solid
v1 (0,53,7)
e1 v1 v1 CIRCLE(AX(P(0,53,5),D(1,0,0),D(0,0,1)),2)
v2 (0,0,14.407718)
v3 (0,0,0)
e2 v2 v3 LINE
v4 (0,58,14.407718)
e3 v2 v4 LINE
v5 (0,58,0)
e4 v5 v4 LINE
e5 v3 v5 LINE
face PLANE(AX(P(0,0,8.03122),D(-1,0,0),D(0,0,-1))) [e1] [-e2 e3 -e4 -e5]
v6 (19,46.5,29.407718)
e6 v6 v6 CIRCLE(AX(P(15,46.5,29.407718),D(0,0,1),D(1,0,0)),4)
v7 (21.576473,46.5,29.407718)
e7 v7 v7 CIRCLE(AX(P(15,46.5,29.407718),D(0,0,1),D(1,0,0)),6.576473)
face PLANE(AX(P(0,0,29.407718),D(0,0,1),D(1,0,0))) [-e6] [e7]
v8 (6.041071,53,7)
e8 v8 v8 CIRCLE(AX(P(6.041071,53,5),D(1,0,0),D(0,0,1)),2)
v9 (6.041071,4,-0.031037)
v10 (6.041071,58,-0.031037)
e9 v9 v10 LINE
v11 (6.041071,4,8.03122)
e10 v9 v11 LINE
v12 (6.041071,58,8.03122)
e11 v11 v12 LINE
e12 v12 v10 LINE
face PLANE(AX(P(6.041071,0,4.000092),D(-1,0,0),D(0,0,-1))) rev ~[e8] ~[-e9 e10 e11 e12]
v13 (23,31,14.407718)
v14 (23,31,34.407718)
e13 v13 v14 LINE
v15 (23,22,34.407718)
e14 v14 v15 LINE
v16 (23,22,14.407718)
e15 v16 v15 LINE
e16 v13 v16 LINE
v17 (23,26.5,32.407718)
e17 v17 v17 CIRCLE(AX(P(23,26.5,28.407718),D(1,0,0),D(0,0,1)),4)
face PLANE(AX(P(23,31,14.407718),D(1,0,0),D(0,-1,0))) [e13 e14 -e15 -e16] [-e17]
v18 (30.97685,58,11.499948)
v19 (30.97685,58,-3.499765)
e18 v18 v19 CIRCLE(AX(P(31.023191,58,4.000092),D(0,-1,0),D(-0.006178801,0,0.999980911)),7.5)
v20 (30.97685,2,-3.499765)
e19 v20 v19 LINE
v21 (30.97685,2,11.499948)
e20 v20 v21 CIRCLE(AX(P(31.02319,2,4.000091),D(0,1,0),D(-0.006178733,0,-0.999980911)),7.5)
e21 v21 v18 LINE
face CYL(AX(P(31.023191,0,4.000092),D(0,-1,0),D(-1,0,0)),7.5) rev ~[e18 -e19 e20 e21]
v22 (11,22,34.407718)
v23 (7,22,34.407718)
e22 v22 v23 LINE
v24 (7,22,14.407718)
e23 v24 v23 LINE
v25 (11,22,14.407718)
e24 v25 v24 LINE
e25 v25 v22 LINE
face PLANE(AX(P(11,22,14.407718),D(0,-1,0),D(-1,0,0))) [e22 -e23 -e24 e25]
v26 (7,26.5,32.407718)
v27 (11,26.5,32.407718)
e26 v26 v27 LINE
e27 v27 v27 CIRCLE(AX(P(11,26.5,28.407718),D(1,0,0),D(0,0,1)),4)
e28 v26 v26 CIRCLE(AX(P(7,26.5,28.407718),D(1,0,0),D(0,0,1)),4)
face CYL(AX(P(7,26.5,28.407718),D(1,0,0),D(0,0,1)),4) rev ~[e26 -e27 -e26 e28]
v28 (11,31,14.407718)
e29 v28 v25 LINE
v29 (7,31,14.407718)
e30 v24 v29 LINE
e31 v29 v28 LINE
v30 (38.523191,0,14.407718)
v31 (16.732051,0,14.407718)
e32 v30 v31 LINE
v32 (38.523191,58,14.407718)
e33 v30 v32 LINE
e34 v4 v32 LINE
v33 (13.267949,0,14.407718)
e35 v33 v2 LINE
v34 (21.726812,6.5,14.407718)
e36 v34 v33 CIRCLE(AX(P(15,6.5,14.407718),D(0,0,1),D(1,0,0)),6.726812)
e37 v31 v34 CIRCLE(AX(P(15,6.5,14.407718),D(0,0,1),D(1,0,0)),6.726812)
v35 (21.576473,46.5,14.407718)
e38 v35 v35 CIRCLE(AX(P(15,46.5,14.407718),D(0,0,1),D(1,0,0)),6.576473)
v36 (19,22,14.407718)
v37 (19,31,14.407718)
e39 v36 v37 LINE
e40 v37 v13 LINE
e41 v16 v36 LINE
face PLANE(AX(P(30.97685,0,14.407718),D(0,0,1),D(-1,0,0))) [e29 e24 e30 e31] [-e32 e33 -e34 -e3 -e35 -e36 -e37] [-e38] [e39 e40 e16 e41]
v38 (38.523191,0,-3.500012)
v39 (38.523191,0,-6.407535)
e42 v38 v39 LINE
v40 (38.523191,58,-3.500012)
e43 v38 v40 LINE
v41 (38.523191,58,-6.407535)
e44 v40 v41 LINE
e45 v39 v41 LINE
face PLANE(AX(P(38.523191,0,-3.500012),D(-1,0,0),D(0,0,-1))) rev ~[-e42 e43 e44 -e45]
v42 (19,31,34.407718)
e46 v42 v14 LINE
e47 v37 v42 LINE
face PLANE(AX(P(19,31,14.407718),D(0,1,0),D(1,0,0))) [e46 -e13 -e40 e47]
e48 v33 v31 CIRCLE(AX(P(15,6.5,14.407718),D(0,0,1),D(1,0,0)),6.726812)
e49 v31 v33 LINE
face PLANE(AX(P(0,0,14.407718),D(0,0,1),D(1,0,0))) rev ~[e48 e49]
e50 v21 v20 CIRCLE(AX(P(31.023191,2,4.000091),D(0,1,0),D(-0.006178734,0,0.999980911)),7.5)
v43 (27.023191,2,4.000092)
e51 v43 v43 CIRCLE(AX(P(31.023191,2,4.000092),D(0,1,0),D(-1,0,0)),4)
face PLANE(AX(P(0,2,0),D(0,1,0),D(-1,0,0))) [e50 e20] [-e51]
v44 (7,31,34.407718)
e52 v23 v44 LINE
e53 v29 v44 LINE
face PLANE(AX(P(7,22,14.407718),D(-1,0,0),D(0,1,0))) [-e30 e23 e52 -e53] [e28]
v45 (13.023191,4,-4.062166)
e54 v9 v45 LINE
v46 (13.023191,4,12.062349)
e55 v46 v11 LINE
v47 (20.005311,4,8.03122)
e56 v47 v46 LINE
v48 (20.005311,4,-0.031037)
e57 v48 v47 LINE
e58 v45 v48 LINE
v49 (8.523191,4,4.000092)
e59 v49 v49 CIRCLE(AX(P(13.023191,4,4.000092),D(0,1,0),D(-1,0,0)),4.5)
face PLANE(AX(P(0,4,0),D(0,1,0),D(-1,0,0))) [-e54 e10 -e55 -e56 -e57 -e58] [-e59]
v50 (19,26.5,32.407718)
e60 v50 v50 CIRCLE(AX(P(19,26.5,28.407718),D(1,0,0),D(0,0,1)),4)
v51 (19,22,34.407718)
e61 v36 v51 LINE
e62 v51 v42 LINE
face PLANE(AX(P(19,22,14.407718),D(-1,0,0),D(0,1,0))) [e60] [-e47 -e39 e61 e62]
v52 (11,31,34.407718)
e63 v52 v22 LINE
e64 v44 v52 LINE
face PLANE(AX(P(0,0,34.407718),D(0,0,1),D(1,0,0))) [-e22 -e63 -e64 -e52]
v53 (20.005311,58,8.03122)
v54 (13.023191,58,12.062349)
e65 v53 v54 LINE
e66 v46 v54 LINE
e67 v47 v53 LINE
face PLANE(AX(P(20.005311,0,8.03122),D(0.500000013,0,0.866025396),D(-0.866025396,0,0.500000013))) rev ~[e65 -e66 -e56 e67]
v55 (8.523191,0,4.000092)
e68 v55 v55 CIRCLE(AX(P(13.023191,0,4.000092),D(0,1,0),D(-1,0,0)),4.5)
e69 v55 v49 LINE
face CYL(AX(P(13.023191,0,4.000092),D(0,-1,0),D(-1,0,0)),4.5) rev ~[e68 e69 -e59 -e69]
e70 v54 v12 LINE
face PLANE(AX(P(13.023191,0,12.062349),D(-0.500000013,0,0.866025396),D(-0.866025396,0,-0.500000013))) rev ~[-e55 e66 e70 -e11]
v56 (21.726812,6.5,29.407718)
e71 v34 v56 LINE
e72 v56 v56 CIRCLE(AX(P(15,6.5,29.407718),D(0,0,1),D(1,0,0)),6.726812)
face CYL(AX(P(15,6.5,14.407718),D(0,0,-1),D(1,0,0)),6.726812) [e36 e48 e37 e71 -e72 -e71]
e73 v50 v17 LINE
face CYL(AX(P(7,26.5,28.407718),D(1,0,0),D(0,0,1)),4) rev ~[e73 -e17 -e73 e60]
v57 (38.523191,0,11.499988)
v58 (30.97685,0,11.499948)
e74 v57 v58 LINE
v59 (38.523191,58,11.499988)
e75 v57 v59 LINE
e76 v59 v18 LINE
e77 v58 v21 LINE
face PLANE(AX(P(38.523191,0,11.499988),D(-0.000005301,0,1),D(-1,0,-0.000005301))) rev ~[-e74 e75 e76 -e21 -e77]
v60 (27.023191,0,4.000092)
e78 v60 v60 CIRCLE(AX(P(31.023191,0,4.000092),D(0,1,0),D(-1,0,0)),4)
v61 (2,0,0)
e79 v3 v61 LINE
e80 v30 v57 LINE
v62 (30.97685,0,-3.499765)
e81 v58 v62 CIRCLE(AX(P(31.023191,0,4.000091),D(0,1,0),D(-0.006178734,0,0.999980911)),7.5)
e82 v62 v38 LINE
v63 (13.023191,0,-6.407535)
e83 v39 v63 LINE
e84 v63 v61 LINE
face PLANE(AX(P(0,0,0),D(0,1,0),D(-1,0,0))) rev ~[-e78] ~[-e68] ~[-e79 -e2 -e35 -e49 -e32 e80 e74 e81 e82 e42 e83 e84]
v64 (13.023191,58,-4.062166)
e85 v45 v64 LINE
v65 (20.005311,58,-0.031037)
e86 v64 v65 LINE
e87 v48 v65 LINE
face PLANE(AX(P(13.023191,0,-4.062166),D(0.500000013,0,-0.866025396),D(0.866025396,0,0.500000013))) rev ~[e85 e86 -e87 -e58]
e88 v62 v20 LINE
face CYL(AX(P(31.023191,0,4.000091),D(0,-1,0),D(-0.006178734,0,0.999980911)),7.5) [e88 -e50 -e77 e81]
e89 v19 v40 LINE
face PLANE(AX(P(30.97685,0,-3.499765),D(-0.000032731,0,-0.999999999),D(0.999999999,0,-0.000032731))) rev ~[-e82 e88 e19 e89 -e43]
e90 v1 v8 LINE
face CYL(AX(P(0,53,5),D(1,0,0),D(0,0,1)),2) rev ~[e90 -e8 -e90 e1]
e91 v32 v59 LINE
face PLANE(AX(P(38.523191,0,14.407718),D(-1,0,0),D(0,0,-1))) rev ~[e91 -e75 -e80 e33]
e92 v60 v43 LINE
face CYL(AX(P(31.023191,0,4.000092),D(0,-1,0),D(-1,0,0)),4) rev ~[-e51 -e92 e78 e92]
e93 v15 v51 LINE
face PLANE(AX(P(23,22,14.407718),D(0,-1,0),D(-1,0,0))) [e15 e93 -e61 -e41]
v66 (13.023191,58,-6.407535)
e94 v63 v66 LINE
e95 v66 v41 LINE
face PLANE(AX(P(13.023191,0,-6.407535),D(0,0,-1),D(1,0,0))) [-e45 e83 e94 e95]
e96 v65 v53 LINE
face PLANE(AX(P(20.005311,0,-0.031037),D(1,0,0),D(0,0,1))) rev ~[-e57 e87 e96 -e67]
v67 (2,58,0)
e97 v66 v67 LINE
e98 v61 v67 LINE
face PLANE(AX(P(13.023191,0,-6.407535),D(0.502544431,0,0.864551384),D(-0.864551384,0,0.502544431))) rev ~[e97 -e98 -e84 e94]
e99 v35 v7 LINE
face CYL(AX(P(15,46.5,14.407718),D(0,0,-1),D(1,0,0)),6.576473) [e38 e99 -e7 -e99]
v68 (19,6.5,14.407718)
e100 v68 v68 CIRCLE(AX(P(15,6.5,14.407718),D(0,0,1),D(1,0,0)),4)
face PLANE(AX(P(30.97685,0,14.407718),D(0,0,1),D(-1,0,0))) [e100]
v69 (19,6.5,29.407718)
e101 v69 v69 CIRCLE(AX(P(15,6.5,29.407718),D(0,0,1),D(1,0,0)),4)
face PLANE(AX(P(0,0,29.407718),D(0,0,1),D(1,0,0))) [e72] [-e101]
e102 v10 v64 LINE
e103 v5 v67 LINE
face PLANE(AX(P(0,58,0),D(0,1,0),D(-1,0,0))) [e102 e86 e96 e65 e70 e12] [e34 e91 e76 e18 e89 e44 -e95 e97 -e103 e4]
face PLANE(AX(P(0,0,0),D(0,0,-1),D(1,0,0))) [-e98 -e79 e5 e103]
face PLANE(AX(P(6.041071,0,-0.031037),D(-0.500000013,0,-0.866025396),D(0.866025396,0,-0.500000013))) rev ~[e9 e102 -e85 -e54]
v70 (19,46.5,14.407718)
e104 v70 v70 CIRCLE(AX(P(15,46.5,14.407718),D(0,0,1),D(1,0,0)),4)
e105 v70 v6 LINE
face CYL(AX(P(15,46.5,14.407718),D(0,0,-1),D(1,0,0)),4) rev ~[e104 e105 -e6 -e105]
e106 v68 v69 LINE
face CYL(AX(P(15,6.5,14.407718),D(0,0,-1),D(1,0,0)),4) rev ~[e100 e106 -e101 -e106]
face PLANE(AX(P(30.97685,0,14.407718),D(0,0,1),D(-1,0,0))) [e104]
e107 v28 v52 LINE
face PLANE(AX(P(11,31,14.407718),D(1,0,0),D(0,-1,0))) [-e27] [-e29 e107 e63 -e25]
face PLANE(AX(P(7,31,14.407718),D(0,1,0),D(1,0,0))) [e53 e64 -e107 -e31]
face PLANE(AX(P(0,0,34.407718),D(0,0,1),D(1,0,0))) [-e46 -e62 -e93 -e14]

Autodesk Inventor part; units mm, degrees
ref_plane "YZ Plane" through (0, 0, 0) normal (1, 0, 0) x (0, 1, 0)
ref_plane "XZ Plane" through (0, 0, 0) normal (0, 1, 0) x (-1, 0, 0)
ref_plane "XY Plane" through (0, 0, 0) normal (0, 0, 1) x (1, 0, 0)
sketch "Sketch1" plane through (0, 0, 0) normal (0, 1, 0) x (-1, 0, 0)
  line L0 (-6.023191, 2.500092) -> (-6.023191, 5.500092) construction
  line L1 (-6.023191, 4.000092) -> (-13.023191, 4.000092) construction
  line L2 (-6.041071, 8.03122) -> (-6.041071, 4.000092)
  line L3 (-6.041071, -0.031037) -> (-13.023191, -4.062166)
  line L4 (-13.023191, -4.062166) -> (-20.005311, -0.031037)
  line L5 (-20.005311, -0.031037) -> (-20.005311, 8.03122)
  line L6 (-20.005311, 8.03122) -> (-13.023191, 12.062349)
  line L7 (-13.023191, 12.062349) -> (-6.041071, 8.03122)
  line L8 (-22.03646, 9.203905) -> (-22.03646, -1.203722)
  line L9 (-22.03646, -1.203722) -> (-13.023191, -6.407535)
  line L10 (-13.023191, 14.407718) -> (-22.03646, 9.203905)
  line L11 (-13.023191, 4.000092) -> (-31.023191, 4.000092) construction
  circle A0 centre (-31.023191, 4.000092) radius 7.5
  line L12 (-13.023191, -6.407535) -> (-30.97685, -6.407535)
  line L13 (-30.97685, -6.407535) -> (-30.97685, -3.499765)
  line L14 (-30.97685, 11.499948) -> (-30.97685, 14.407718)
  line L15 (-30.97685, 14.407718) -> (-13.023191, 14.407718)
  circle A1 centre (-13.023191, 4.000092) radius 4.5
  line L16 (-30.97685, 11.499988) -> (-30.97685, 14.407718)
  line L17 (-30.97685, -3.500012) -> (-30.97685, -6.407535)
  line L18 (-13.023191, -4.062166) -> (-13.023191, -6.407535)
  line L19 (-13.023191, 12.062349) -> (-13.023191, 14.407718)
  line L20 (-6.041071, 4.000092) -> (-6.041071, -0.031037)
  line L21 (-13.023191, 14.407718) -> (0, 14.407718)
  line L22 (0, 39) -> (0, 0)
  line L23 (0, 14.407718) -> (0, 8.03122)
  line L24 (0, 8.03122) -> (-6.041071, 8.03122)
  line L25 (0, 0) -> (-6, 0)
  line L26 (-13.023191, -6.407535) -> (-2, 0)
  line L27 (-2, 0) -> (-2, 8.03122)
  line L28 (-2, 0) -> (0, 0)
  line L29 (0, 8.03122) -> (0, 0)
  circle A2 centre (-31.023191, 4.000092) radius 4
  line L30 (-30.97685, -3.500012) -> (-38.523191, -3.500012)
  line L31 (-38.523191, -3.500012) -> (-38.523191, -6.407535)
  line L32 (-38.523191, -6.407535) -> (-30.97685, -6.407535)
  line L33 (-30.97685, -6.407535) -> (-30.97685, -3.500012)
  line L34 (-30.97685, 14.407718) -> (-38.523191, 14.407718)
  line L35 (-38.523191, 14.407718) -> (-38.523191, 11.499988)
  line L36 (-38.523191, 11.499988) -> (-30.97685, 11.499988)
  line L37 (-30.97685, 11.499988) -> (-30.97685, 14.407718)
  line L38 (0, 26) -> (-15, 26) construction
  point P0 (0, 31)
  dimension "d0" = 7
  dimension "d1" = 18
  dimension "d2" = 15
  dimension "d3" = 9
  dimension "d4" = 8
  dimension "d6" = 15
extrude "Extrusion1" add sketch "Sketch1" along normal blind 58 contours L24 L27 L26 L18 L3 L20 L2 | L7 L19 L21 L22 L24 | L6 L5 L4 L18 L9 L8 L10 L19 | L24 L22 L25 L27 | L10 L8 L9 L12 L13 A0 L14 L15 | L14 L36 L35 L34 | L32 L31 L30 L13
sketch "Sketch2" plane through (0, 0, 14.407718) normal (0, 0, 1) x (1, 0, 0)
  line L0 (0, 10) -> (15, 10) construction
  line L1 (0, 0) -> (38.523191, 0) construction
  line L2 (15, 0) -> (15, 6.5) construction
  line L3 (15, 0) -> (21.5, 0) construction
  circle A0 centre (15, 6.5) radius 4
  line L4 (15, 6.5) -> (15, 46.5) construction
  line L5 (23.523191, 58) -> (23.523191, 0) construction
  line L6 (15, 6.5) -> (55, 6.5) construction
  circle A1 centre (15, 46.5) radius 4
  circle A2 centre (15, 46.5) radius 6.576473
  circle A3 centre (15, 6.5) radius 6.726812
  line L7 (15, 46.5) -> (15, 26.5) construction
  line L8 (15, 46.5) -> (35, 46.5) construction
  line L9 (15, 26.5) -> (11, 26.5) construction
  line L10 (15, 26.5) -> (19, 26.5) construction
  line L11 (15, 26.5) -> (19, 26.5) construction
  line L12 (7, 31) -> (11, 31)
  line L13 (11, 31) -> (11, 22)
  line L14 (11, 22) -> (7, 22)
  line L15 (7, 22) -> (7, 31)
  line L16 (7, 31) -> (11, 22) construction
  line L17 (11, 31) -> (7, 22) construction
  line L18 (23, 22) -> (19, 22)
  line L19 (19, 22) -> (19, 31)
  line L20 (19, 31) -> (23, 31)
  line L21 (23, 31) -> (23, 22)
  line L22 (23, 22) -> (19, 31) construction
  line L23 (19, 22) -> (23, 31) construction
  point P0 (9, 26.5)
  point P1 (21, 26.5)
  dimension "d9" = 15
  dimension "d10" = 6.5
  dimension "d11" = 90
  dimension "d12" = 8
  dimension "d13" = 40
  dimension "d14" = 90
  dimension "d15" = 8
  dimension "d16" = 2.57647
  dimension "d17" = 2.72681
  dimension "d18" = 20
  dimension "d19" = 90
  dimension "d20" = 4
  dimension "d21" = 180
extrude "Extrusion2" add sketch "Sketch2" along normal blind 15 contours A2 | A3
extrude "Extrusion3" add sketch "Sketch2" along normal blind 20 contours L12 L13 L14 L15 | L18 L19 L20 L21
hole "Hole1" at (7, 26.5, 28.407718) direction (1, 0, 0) diameter 8 end through all
extrude "Extrusion4" add sketch "Sketch1" along normal blind 4 contours L2 L20 L3 L4 L5 L6 L7
hole "Hole2" at (0, 53, 5) direction (1, 0, 0) diameter 4 end up to surface
sketch "Sketch1 outline for Extrusion5" plane through (0, 0, 0) normal (0, 1, 0) x (-1, 0, 0)
  arc A0 (-30.97685, 11.499948) -> (-30.97685, -3.499765) centre (-31.023191, 4.000092) ccw
  arc A1 (-30.97685, -3.499765) -> (-30.97685, 11.499948) centre (-31.023191, 4.000092) ccw
  circle A2 centre (-31.023191, 4.000092) radius 4
extrude "Extrusion5" add sketch "Sketch1 outline for Extrusion5" along normal blind 2
properties part number "XMountR"
